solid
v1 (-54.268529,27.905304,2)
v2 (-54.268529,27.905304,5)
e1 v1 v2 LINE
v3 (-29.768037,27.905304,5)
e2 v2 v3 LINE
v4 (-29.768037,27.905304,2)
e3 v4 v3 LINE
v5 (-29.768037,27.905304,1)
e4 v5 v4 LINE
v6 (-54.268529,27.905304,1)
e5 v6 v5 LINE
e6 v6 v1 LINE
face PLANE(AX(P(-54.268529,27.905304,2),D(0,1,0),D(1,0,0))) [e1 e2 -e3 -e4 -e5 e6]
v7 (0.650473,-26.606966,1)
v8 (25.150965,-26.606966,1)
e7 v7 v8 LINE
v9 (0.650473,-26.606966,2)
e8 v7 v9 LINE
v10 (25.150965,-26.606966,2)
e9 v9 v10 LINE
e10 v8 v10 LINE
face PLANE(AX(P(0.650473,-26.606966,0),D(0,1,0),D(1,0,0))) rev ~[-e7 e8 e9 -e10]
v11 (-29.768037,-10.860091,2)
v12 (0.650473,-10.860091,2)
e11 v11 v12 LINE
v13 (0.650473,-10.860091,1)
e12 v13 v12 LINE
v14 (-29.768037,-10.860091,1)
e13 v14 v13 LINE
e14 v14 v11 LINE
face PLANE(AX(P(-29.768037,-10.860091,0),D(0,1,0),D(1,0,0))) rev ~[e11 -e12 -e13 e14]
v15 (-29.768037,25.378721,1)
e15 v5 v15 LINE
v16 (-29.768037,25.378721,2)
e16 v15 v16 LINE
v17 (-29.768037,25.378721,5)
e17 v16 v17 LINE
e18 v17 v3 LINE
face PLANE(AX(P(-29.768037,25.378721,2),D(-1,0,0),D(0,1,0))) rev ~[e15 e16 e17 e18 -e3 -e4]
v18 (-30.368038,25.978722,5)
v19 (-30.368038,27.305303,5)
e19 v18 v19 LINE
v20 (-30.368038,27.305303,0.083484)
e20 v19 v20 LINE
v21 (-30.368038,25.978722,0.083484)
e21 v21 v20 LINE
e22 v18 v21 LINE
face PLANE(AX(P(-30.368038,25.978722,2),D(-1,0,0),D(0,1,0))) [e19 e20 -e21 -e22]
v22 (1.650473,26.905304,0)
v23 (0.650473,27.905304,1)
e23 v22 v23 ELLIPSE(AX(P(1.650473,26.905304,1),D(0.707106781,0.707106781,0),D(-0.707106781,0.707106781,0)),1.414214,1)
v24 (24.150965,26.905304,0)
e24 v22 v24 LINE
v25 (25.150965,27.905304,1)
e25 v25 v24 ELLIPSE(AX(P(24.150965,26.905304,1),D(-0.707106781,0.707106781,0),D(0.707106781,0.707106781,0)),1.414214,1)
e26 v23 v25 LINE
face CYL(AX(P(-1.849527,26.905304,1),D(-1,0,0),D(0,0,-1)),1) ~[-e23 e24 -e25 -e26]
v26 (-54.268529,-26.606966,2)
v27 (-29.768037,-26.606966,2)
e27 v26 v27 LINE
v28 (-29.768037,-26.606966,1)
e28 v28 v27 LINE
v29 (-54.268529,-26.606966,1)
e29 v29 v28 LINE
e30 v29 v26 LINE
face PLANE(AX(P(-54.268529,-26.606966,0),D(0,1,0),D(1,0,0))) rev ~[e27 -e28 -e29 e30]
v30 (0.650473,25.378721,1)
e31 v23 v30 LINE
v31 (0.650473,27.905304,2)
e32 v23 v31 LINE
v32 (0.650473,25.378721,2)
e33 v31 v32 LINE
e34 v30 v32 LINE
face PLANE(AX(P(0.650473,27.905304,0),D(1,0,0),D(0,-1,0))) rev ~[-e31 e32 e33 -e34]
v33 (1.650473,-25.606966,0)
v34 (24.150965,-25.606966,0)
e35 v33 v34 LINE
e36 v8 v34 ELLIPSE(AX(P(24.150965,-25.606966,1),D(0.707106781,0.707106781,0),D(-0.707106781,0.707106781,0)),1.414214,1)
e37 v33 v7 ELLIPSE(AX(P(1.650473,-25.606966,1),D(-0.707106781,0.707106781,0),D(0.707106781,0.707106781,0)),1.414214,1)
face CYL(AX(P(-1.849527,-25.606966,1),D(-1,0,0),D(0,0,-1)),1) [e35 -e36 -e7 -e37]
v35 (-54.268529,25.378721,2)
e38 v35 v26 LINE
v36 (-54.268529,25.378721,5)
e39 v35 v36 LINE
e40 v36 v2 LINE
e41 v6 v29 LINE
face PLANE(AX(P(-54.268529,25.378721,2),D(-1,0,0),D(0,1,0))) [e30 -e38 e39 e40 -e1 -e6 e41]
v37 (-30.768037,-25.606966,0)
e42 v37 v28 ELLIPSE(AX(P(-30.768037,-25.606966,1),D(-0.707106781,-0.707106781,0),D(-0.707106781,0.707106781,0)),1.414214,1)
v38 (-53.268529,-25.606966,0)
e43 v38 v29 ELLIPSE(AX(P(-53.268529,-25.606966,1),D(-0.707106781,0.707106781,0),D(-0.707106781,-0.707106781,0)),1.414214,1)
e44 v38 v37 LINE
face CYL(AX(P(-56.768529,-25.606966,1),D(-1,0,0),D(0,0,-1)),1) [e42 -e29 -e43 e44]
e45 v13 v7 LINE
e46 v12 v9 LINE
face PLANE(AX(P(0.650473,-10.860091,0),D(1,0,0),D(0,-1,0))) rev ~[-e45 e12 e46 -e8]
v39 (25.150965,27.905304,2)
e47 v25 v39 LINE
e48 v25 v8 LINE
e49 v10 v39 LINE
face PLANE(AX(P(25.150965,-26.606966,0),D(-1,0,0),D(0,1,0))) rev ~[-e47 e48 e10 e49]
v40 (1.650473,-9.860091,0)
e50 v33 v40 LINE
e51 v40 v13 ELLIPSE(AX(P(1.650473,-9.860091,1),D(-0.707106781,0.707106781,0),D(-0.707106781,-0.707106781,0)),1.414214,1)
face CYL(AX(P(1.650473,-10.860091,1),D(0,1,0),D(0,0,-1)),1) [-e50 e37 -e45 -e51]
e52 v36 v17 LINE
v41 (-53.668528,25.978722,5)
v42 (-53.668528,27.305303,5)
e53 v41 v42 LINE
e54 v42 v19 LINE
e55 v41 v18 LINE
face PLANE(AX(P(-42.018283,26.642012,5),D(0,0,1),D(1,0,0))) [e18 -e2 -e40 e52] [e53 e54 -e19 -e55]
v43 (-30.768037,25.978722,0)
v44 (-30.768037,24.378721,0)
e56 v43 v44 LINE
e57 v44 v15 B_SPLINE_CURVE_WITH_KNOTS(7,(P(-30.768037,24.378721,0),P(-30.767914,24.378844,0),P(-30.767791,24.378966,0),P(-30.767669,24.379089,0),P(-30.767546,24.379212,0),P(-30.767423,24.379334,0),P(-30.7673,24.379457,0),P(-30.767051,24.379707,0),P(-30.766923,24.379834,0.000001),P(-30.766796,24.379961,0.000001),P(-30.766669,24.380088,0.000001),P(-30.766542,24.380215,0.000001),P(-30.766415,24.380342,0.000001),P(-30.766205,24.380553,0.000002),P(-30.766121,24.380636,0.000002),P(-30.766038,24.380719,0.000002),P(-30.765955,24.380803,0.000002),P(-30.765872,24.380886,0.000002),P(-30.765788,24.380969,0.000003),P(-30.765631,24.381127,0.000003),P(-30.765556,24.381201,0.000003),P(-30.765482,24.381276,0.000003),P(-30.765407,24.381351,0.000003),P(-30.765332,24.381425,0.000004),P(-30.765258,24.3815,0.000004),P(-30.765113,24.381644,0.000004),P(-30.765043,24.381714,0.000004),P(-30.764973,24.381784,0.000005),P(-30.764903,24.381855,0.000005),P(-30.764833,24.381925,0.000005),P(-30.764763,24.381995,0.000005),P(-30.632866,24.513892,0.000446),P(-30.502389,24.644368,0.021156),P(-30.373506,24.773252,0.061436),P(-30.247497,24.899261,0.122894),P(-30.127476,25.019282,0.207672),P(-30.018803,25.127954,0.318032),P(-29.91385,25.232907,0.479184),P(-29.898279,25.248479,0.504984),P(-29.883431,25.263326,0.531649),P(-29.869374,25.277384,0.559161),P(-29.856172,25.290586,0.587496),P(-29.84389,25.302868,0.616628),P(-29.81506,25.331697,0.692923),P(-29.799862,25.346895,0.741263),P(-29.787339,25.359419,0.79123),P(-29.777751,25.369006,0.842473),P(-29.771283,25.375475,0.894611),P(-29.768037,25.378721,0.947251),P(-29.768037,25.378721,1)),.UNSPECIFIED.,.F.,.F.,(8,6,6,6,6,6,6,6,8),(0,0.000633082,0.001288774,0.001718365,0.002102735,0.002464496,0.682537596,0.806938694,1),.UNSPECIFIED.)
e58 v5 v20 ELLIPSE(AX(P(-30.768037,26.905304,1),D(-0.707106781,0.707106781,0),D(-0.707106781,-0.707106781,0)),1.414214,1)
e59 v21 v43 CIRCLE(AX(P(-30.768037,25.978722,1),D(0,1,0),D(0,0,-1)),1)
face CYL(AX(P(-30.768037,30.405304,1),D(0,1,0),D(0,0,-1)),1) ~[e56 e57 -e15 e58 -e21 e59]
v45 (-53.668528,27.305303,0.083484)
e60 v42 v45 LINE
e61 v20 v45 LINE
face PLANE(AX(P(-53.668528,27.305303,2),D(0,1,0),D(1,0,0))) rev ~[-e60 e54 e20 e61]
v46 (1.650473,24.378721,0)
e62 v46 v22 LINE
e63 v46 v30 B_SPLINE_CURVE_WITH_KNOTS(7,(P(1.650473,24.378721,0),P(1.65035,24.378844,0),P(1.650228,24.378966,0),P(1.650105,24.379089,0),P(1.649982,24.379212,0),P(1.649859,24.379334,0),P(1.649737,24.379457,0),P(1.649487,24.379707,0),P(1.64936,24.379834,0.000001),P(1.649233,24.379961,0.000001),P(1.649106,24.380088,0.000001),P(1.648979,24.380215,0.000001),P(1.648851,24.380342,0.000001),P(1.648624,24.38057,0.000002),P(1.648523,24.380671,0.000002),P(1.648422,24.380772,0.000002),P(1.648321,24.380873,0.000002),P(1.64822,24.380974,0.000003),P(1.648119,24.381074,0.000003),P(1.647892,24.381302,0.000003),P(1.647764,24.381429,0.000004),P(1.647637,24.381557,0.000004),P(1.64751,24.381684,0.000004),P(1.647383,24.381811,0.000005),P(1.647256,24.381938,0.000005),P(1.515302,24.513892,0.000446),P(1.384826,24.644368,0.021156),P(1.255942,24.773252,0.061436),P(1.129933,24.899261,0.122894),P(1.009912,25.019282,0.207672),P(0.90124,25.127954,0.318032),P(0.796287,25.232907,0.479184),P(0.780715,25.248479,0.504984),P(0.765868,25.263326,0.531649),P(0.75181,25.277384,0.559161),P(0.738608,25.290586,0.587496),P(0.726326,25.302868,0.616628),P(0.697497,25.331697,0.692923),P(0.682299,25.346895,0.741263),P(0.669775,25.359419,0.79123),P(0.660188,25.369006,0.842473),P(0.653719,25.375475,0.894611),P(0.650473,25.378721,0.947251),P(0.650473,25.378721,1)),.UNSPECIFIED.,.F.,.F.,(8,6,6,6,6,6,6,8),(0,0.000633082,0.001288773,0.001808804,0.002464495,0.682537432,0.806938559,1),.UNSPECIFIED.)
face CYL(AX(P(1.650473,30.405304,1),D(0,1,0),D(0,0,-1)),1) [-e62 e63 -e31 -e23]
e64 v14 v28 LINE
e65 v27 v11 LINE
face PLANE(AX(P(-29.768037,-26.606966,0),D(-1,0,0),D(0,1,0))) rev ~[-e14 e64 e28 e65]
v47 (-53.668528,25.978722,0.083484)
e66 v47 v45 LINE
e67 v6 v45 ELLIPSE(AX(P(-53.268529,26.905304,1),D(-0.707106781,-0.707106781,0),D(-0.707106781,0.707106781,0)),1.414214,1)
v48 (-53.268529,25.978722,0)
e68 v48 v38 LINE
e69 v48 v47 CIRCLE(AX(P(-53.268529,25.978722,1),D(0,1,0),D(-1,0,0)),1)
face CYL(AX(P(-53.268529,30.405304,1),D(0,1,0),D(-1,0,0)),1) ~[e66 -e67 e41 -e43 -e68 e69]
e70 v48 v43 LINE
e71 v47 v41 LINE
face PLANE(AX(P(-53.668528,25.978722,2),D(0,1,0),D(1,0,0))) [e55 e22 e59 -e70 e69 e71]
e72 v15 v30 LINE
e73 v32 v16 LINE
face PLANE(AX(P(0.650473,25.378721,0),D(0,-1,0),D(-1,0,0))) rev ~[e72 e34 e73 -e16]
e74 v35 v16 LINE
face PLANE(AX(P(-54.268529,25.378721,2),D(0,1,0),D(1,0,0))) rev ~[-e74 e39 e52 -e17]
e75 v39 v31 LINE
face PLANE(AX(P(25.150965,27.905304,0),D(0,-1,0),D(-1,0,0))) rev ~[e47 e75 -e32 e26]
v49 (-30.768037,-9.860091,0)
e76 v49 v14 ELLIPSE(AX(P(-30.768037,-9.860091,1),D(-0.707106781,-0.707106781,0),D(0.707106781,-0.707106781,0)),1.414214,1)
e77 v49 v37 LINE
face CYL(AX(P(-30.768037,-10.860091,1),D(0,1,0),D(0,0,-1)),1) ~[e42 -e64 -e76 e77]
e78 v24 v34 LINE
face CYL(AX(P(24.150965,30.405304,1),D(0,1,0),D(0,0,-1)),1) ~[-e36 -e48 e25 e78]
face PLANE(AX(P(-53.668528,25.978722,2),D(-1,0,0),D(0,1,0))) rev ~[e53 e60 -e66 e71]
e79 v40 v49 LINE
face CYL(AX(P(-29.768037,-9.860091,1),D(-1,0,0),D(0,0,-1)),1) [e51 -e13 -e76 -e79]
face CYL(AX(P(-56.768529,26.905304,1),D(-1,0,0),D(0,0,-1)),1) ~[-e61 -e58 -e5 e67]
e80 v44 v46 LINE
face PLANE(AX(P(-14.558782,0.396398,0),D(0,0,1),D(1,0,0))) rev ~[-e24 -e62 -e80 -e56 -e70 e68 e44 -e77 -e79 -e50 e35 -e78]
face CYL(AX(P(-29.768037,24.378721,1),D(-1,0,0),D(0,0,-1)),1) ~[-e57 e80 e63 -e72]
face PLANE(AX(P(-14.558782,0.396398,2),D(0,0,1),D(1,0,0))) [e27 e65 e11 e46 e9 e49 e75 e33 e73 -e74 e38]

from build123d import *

# Parameters (mm, degrees)
F1_DEPTH     = 2
F2_W         = 23.3004903048
F2_H         = 1.3265815725
F3_DEPTH     = 2
F2_W_2       = 24.5004919916
F2_H_2       = 2.5265832593
F4_DEPTH     = 3
F5_T1_DEPTH  = 29.5004919916
F5_T3_DEPTH  = 59.5122700134
F5_T5_DEPTH  = 5.0265832593
F5_T7_DEPTH  = 30.4185097339
F5_T9_DEPTH  = 18.246874844
F5_T11_DEPTH = 29.5004919916
F5_T17_DEPTH = 7.5265832593
F5_T21_DEPTH = 32.9185097339
F5_T28_DEPTH = 32.9185097339
F5_T32_DEPTH = 7.5265832593
F5_T39_DEPTH = 20.746874844
F5_T43_DEPTH = 32.9185097339
F5_T50_DEPTH = 32.9185097339
F5_T54_DEPTH = 20.746874844


# Not quite as in the source:
# - a fillet or chamfer that OpenCascade refuses, or shapes differently, is made with other operations: its cross-section is extruded or revolved along the edge and cut away or added


with BuildPart() as f1:
    # F0 (on Top) → F1 (new body)
    with BuildSketch(Plane.XY):
        Polygon((25.1509650471, -26.6069659193), (25.1509650471, 27.9053040941), (0.6504730554, 27.9053040941), (0.6504730554, 25.3787208349), (-29.7680366784, 25.3787208349), (-29.7680366784, 27.9053040941), (-54.2685286701, 27.9053040941), (-54.2685286701, -26.6069659193), (-29.7680366784, -26.6069659193), (-29.7680366784, -10.8600910753), (0.6504730554, -10.8600910753), (0.6504730554, -26.6069659193), align=None)
    extrude(amount=F1_DEPTH)

    # F0 (on Top) + F2 (on face) → F3 (cut)
    with BuildSketch(Plane.XY):
        Polygon((25.1509650471, -26.6069659193), (25.1509650471, 27.9053040941), (0.6504730554, 27.9053040941), (0.6504730554, 25.3787208349), (-29.7680366784, 25.3787208349), (-29.7680366784, 27.9053040941), (-54.2685286701, 27.9053040941), (-54.2685286701, -26.6069659193), (-29.7680366784, -26.6069659193), (-29.7680366784, -10.8600910753), (0.6504730554, -10.8600910753), (0.6504730554, -26.6069659193), align=None)
    with BuildSketch(Plane.XY.offset(2)):
        with Locations((-42.0182826743, 26.6420124645)):
            Rectangle(F2_W, F2_H)
    extrude(amount=-F3_DEPTH, mode=Mode.SUBTRACT)

    # F2 (on face) → F4 (join)
    with BuildSketch(Plane.XY.offset(2)):
        with Locations((-42.0182826743, 26.6420124645)):
            Rectangle(F2_W_2, F2_H_2)
        with Locations((-42.0182826743, 26.6420124645)):
            Rectangle(F2_W, F2_H, mode=Mode.SUBTRACT)
    extrude(amount=F4_DEPTH)

    # F5: fillet of radius 1 on 12 edges, made by hand

    # F5_s2 → F5_t1 (cut)
    with BuildSketch(Plane.YZ.offset(-56.7685286701)):
        with BuildLine():
            ThreePointArc((-25.6069659193, 0), (-26.3140727005, 0.2928932188), (-26.6069659193, 1))
            Line((-26.6069659193, 1), (-26.6069659193, 0))
            Line((-26.6069659193, 0), (-25.6069659193, 0))
        make_face()
        with BuildLine():
            ThreePointArc((26.9053040941, 0), (27.6124108753, 0.2928932188), (27.9053040941, 1))
            Line((27.9053040941, 1), (27.9053040941, 0))
            Line((27.9053040941, 0), (26.9053040941, 0))
        make_face()
    extrude(amount=F5_T1_DEPTH, mode=Mode.SUBTRACT)

    # F5_s4 → F5_t3 (cut)
    with BuildSketch(Plane.XZ.offset(-30.4053040941)):
        with BuildLine():
            ThreePointArc((-54.2685286701, 1), (-53.9756354513, 0.2928932188), (-53.2685286701, 0))
            Line((-53.2685286701, 0), (-54.2685286701, 0))
            Line((-54.2685286701, 0), (-54.2685286701, 1))
        make_face()
        with BuildLine():
            ThreePointArc((24.1509650471, 0), (24.8580718283, 0.2928932188), (25.1509650471, 1))
            Line((25.1509650471, 1), (25.1509650471, 0))
            Line((25.1509650471, 0), (24.1509650471, 0))
        make_face()
    extrude(amount=F5_T3_DEPTH, mode=Mode.SUBTRACT)

    # F5_s6 → F5_t5 (cut)
    with BuildSketch(Plane.XZ.offset(-30.4053040941)):
        with BuildLine():
            ThreePointArc((-30.7680366784, 0), (-30.0609298972, 0.2928932188), (-29.7680366784, 1))
            Line((-29.7680366784, 1), (-29.7680366784, 0))
            Line((-29.7680366784, 0), (-30.7680366784, 0))
        make_face()
        with BuildLine():
            ThreePointArc((1.6504730554, 0), (0.9433662742, 0.2928932188), (0.6504730554, 1))
            Line((0.6504730554, 1), (0.6504730554, 0))
            Line((0.6504730554, 0), (1.6504730554, 0))
        make_face()
    extrude(amount=F5_T5_DEPTH, mode=Mode.SUBTRACT)

    # F5_s8 → F5_t7 (cut)
    with BuildSketch(Plane.YZ.offset(-29.7680366784)):
        with BuildLine():
            ThreePointArc((24.3787208349, 0), (25.085827616, 0.2928932188), (25.3787208349, 1))
            Line((25.3787208349, 1), (25.3787208349, 0))
            Line((25.3787208349, 0), (24.3787208349, 0))
        make_face()
        with BuildLine():
            ThreePointArc((-9.8600910753, 0), (-10.5671978565, 0.2928932188), (-10.8600910753, 1))
            Line((-10.8600910753, 1), (-10.8600910753, 0))
            Line((-10.8600910753, 0), (-9.8600910753, 0))
        make_face()
    extrude(amount=F5_T7_DEPTH, mode=Mode.SUBTRACT)

    # F5_s10 → F5_t9 (cut)
    with BuildSketch(Plane.XZ.offset(10.8600910753)):
        with BuildLine():
            ThreePointArc((-30.7680366784, 0), (-30.0609298972, 0.2928932188), (-29.7680366784, 1))
            Line((-29.7680366784, 1), (-29.7680366784, 0))
            Line((-29.7680366784, 0), (-30.7680366784, 0))
        make_face()
        with BuildLine():
            ThreePointArc((1.6504730554, 0), (0.9433662742, 0.2928932188), (0.6504730554, 1))
            Line((0.6504730554, 1), (0.6504730554, 0))
            Line((0.6504730554, 0), (1.6504730554, 0))
        make_face()
    extrude(amount=F5_T9_DEPTH, mode=Mode.SUBTRACT)

    # F5_s12 → F5_t11 (cut)
    with BuildSketch(Plane.YZ.offset(-1.8495269446)):
        with BuildLine():
            ThreePointArc((-25.6069659193, 0), (-26.3140727005, 0.2928932188), (-26.6069659193, 1))
            Line((-26.6069659193, 1), (-26.6069659193, 0))
            Line((-26.6069659193, 0), (-25.6069659193, 0))
        make_face()
        with BuildLine():
            ThreePointArc((26.9053040941, 0), (27.6124108753, 0.2928932188), (27.9053040941, 1))
            Line((27.9053040941, 1), (27.9053040941, 0))
            Line((27.9053040941, 0), (26.9053040941, 0))
        make_face()
    extrude(amount=F5_T11_DEPTH, mode=Mode.SUBTRACT)


with BuildPart() as f5_tool15:
    # F5_s16 → F5_t17 (new body)
    with BuildSketch(Plane.XZ.offset(-22.8787208349)):
        with BuildLine():
            ThreePointArc((-30.7680366784, 0), (-30.0609298972, 0.2928932188), (-29.7680366784, 1))
            Line((-29.7680366784, 1), (-29.7680366784, 0))
            Line((-29.7680366784, 0), (-30.7680366784, 0))
        make_face()
    extrude(amount=-F5_T17_DEPTH)

    split(bisect_by=Plane.XZ.offset(-25.3787208349), keep=Keep.TOP)


with BuildPart() as f5_tool19:
    # F5_s20 → F5_t21 (new body)
    with BuildSketch(Plane.YZ.offset(0.6504730554)):
        with BuildLine():
            ThreePointArc((24.3787208349, 0), (25.085827616, 0.2928932188), (25.3787208349, 1))
            Line((25.3787208349, 1), (25.3787208349, 0))
            Line((25.3787208349, 0), (24.3787208349, 0))
        make_face()
    extrude(amount=-F5_T21_DEPTH)

    split(bisect_by=Plane.YZ.offset(-29.7680366784), keep=Keep.BOTTOM)


with BuildPart() as f5_tool15_1:
    add(f5_tool15.part)

    # F5_t23: intersect F5_tool19
    add(f5_tool19.part, mode=Mode.INTERSECT)


with BuildPart() as f1_1:
    add(f1.part)

    # F5_t13: cut F5_tool15
    add(f5_tool15_1.part, mode=Mode.SUBTRACT)


with BuildPart() as f5_tool26:
    # F5_s27 → F5_t28 (new body)
    with BuildSketch(Plane.YZ.offset(3.1504730554)):
        with BuildLine():
            ThreePointArc((24.3787208349, 0), (25.085827616, 0.2928932188), (25.3787208349, 1))
            Line((25.3787208349, 1), (25.3787208349, 0))
            Line((25.3787208349, 0), (24.3787208349, 0))
        make_face()
    extrude(amount=-F5_T28_DEPTH)

    split(bisect_by=Plane.YZ.offset(0.6504730554), keep=Keep.TOP)


with BuildPart() as f5_tool30:
    # F5_s31 → F5_t32 (new body)
    with BuildSketch(Plane.XZ.offset(-30.4053040941)):
        with BuildLine():
            ThreePointArc((1.6504730554, 0), (0.9433662742, 0.2928932188), (0.6504730554, 1))
            Line((0.6504730554, 1), (0.6504730554, 0))
            Line((0.6504730554, 0), (1.6504730554, 0))
        make_face()
    extrude(amount=F5_T32_DEPTH)

    split(bisect_by=Plane.XZ.offset(-25.3787208349), keep=Keep.TOP)


with BuildPart() as f5_tool26_1:
    add(f5_tool26.part)

    # F5_t34: intersect F5_tool30
    add(f5_tool30.part, mode=Mode.INTERSECT)


with BuildPart() as f1_2:
    add(f1_1.part)

    # F5_t24: cut F5_tool26
    add(f5_tool26_1.part, mode=Mode.SUBTRACT)


with BuildPart() as f5_tool37:
    # F5_s38 → F5_t39 (new body)
    with BuildSketch(Plane.XZ.offset(29.1069659193)):
        with BuildLine():
            ThreePointArc((-30.7680366784, 0), (-30.0609298972, 0.2928932188), (-29.7680366784, 1))
            Line((-29.7680366784, 1), (-29.7680366784, 0))
            Line((-29.7680366784, 0), (-30.7680366784, 0))
        make_face()
    extrude(amount=-F5_T39_DEPTH)

    split(bisect_by=Plane.XZ.offset(10.8600910753), keep=Keep.BOTTOM)


with BuildPart() as f5_tool41:
    # F5_s42 → F5_t43 (new body)
    with BuildSketch(Plane.YZ.offset(-32.2680366784)):
        with BuildLine():
            ThreePointArc((-9.8600910753, 0), (-10.5671978565, 0.2928932188), (-10.8600910753, 1))
            Line((-10.8600910753, 1), (-10.8600910753, 0))
            Line((-10.8600910753, 0), (-9.8600910753, 0))
        make_face()
    extrude(amount=F5_T43_DEPTH)

    split(bisect_by=Plane.YZ.offset(-29.7680366784), keep=Keep.BOTTOM)


with BuildPart() as f5_tool37_1:
    add(f5_tool37.part)

    # F5_t45: intersect F5_tool41
    add(f5_tool41.part, mode=Mode.INTERSECT)


with BuildPart() as f1_3:
    add(f1_2.part)

    # F5_t35: cut F5_tool37
    add(f5_tool37_1.part, mode=Mode.SUBTRACT)


with BuildPart() as f5_tool48:
    # F5_s49 → F5_t50 (new body)
    with BuildSketch(Plane.YZ.offset(-29.7680366784)):
        with BuildLine():
            ThreePointArc((-9.8600910753, 0), (-10.5671978565, 0.2928932188), (-10.8600910753, 1))
            Line((-10.8600910753, 1), (-10.8600910753, 0))
            Line((-10.8600910753, 0), (-9.8600910753, 0))
        make_face()
    extrude(amount=F5_T50_DEPTH)

    split(bisect_by=Plane.YZ.offset(0.6504730554), keep=Keep.TOP)


with BuildPart() as f5_tool52:
    # F5_s53 → F5_t54 (new body)
    with BuildSketch(Plane.XZ.offset(8.3600910753)):
        with BuildLine():
            ThreePointArc((1.6504730554, 0), (0.9433662742, 0.2928932188), (0.6504730554, 1))
            Line((0.6504730554, 1), (0.6504730554, 0))
            Line((0.6504730554, 0), (1.6504730554, 0))
        make_face()
    extrude(amount=F5_T54_DEPTH)

    split(bisect_by=Plane.XZ.offset(10.8600910753), keep=Keep.BOTTOM)


with BuildPart() as f5_tool48_1:
    add(f5_tool48.part)

    # F5_t56: intersect F5_tool52
    add(f5_tool52.part, mode=Mode.INTERSECT)


with BuildPart() as f1_4:
    add(f1_3.part)

    # F5_t46: cut F5_tool48
    add(f5_tool48_1.part, mode=Mode.SUBTRACT)


solid = f1_4.part
